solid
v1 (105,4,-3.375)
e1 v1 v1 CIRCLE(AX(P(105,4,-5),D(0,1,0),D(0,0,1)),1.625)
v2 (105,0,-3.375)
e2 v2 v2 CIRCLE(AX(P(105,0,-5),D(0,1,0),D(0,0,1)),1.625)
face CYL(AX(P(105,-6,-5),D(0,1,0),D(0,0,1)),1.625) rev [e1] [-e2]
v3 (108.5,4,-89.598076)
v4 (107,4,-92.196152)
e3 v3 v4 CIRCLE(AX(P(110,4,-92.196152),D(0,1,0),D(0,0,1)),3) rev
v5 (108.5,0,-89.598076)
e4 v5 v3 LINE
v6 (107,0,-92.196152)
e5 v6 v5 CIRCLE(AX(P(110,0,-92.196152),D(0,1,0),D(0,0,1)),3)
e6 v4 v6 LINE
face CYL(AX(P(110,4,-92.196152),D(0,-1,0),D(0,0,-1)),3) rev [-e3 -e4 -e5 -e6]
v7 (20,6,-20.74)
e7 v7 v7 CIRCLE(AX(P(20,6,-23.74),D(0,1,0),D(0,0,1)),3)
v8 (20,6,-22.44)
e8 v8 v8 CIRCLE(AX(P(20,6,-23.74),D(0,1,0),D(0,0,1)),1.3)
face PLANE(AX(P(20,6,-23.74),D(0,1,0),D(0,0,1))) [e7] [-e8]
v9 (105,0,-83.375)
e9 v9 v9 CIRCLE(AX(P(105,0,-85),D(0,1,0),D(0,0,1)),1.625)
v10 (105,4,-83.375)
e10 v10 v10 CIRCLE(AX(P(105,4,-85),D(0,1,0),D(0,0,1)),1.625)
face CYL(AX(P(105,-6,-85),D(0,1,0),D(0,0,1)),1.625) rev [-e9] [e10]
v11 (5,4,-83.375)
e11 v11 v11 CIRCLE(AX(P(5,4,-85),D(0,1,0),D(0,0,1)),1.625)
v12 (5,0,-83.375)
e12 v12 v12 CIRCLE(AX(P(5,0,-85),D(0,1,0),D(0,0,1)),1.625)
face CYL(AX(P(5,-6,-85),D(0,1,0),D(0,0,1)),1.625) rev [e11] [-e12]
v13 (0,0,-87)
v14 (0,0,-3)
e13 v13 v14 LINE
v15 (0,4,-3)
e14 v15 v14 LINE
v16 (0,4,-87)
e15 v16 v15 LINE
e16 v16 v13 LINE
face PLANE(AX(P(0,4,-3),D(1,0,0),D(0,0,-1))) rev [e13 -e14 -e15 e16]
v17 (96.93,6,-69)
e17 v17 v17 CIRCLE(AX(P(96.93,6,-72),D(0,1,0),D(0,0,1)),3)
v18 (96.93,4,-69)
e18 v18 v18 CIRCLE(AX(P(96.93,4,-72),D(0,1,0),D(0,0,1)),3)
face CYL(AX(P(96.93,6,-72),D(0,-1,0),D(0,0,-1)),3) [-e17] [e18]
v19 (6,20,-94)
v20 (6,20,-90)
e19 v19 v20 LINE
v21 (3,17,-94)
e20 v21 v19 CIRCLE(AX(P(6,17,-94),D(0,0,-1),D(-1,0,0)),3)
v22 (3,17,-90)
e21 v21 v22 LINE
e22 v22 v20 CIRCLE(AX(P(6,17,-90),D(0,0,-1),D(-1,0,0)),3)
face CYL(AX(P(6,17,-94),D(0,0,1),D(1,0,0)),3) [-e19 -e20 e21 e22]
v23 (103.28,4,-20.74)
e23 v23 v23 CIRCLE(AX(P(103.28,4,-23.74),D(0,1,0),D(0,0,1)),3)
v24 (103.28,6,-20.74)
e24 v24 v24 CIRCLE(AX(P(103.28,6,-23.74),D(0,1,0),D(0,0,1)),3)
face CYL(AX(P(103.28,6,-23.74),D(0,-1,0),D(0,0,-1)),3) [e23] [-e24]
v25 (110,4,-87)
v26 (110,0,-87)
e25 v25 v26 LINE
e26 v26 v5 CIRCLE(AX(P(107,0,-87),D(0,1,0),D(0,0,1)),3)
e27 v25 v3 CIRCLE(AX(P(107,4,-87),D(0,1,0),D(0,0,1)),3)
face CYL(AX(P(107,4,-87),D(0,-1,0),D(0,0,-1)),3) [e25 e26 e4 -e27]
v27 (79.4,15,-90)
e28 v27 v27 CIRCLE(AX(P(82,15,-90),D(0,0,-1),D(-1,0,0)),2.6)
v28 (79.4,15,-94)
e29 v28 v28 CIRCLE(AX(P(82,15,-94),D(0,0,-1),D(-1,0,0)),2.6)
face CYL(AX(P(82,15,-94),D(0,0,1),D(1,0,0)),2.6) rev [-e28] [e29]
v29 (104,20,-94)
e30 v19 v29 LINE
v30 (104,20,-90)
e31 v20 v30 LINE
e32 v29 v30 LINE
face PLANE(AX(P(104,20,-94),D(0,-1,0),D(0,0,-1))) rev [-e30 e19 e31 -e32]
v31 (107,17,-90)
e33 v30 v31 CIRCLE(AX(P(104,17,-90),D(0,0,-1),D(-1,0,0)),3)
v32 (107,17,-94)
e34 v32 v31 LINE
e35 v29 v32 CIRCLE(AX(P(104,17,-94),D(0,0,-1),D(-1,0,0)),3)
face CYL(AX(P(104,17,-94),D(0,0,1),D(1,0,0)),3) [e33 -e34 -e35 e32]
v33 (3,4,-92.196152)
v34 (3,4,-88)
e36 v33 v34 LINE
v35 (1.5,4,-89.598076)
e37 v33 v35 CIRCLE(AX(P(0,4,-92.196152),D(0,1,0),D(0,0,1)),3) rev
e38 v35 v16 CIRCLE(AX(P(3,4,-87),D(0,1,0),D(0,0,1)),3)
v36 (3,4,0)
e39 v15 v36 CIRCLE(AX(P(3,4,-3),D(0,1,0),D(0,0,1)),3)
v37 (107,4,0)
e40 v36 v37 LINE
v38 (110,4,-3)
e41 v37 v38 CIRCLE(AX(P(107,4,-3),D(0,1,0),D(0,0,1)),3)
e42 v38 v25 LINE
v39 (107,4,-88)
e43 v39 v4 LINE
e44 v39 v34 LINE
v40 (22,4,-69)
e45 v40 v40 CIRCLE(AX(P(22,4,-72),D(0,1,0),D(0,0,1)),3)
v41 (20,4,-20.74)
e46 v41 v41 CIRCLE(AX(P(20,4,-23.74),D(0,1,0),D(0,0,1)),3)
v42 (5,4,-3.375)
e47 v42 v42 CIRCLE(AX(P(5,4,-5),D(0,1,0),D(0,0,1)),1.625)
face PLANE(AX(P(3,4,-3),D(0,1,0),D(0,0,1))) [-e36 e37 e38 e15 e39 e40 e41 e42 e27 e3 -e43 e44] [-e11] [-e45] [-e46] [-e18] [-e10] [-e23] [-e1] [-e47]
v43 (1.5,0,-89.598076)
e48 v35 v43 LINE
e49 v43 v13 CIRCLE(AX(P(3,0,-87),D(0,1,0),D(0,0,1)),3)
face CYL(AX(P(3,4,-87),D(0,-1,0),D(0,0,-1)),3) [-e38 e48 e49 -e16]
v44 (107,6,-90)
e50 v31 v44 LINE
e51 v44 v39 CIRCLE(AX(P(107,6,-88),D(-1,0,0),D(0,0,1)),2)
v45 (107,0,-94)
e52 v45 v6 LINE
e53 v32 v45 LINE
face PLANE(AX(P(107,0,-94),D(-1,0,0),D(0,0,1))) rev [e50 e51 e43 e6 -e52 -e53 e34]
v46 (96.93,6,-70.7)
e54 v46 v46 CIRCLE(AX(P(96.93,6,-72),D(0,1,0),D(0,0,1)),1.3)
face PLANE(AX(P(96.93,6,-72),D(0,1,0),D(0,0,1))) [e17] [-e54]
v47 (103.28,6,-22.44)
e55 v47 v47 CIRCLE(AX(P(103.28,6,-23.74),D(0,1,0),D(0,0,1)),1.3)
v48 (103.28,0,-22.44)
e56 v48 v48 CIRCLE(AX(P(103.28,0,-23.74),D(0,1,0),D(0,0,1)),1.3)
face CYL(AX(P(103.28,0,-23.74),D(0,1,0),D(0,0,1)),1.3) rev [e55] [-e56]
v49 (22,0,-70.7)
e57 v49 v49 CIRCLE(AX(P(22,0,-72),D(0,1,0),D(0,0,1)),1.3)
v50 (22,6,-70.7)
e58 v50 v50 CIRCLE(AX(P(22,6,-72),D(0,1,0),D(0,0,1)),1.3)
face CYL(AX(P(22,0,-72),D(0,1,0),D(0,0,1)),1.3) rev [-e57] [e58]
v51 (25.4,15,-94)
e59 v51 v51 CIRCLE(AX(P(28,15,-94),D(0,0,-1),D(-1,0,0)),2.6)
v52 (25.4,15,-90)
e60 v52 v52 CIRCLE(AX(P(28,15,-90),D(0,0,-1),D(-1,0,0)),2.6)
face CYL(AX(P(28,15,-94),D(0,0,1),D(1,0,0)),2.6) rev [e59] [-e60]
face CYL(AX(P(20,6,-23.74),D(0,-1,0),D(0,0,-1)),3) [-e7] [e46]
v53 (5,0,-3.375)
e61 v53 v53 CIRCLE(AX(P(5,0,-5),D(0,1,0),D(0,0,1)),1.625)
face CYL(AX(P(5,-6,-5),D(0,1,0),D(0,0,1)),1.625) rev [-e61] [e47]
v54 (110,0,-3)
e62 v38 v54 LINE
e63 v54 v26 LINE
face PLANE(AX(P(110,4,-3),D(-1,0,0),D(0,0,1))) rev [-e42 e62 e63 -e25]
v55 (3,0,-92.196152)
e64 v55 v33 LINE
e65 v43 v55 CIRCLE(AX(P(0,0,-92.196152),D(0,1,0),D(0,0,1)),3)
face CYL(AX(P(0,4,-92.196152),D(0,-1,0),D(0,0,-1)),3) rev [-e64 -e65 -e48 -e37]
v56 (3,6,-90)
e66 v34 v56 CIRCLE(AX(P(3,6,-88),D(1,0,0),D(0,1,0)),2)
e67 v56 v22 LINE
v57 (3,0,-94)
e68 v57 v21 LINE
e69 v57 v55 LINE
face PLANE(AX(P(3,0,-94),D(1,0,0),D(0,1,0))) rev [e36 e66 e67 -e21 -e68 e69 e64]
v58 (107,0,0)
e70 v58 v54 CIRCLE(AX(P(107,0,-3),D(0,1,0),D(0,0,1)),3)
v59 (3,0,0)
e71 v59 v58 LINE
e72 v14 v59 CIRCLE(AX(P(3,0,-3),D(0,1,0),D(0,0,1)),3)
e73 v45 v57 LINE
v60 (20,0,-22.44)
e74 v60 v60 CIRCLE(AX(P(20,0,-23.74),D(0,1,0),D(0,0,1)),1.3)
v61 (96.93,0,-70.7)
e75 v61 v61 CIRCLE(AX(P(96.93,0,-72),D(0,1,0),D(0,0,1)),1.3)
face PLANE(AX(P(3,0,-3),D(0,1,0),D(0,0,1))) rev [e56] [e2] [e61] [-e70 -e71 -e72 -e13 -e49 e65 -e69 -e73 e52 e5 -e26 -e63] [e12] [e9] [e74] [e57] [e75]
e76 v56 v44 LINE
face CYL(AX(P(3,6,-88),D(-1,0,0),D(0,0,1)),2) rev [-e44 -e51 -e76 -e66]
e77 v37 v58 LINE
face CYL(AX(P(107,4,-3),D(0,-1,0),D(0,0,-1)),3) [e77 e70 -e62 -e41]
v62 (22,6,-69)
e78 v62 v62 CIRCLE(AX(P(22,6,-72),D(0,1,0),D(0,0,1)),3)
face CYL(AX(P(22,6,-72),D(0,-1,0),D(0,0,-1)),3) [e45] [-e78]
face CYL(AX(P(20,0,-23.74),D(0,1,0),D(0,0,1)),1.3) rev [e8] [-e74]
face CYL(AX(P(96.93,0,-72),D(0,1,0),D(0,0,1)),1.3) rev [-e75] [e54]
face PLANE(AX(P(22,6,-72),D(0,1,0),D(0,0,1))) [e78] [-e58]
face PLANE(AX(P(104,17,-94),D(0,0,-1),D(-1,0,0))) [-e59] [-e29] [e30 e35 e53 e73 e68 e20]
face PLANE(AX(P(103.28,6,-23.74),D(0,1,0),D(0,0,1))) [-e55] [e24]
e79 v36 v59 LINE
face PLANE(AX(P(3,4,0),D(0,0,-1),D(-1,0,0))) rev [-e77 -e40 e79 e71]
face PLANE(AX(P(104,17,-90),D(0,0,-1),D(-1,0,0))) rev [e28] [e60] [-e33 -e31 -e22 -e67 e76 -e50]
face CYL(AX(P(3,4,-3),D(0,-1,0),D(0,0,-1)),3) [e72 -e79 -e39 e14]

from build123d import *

# Parameters (mm, degrees)
BOSS_EXTRUDE1_DEPTH = 4
SKETCH2_R           = 3
BOSS_EXTRUDE2_DEPTH = 2
SKETCH3_R           = 1.3
CUT_EXTRUDE1_DEPTH  = 6
SKETCH4_R           = 2.6
BOSS_EXTRUDE3_DEPTH = 4
FILLET1_R           = 3
FILLET2_R           = 2
SKETCH5_R           = 1.625
CUT_EXTRUDE2_DEPTH  = 10


with BuildPart() as part:
    # Sketch1 → Boss-Extrude1 (new body)
    with BuildSketch(Plane(origin=(0, 0, 0), x_dir=(1, 0, 0), z_dir=(0, 1, 0))):
        with BuildLine():
            Line((3, 0), (107, 0))
            ThreePointArc((107, 0), (109.121320344, 0.878679656), (110, 3))
            Line((110, 3), (110, 87))
            ThreePointArc((110, 87), (109.121320344, 89.121320344), (107, 90))
            Line((107, 90), (3, 90))
            ThreePointArc((3, 90), (0.878679656, 89.121320344), (0, 87))
            Line((0, 87), (0, 3))
            ThreePointArc((0, 3), (0.878679656, 0.878679656), (3, 0))
        make_face()
    extrude(amount=BOSS_EXTRUDE1_DEPTH)

    # Sketch2 → Boss-Extrude2 (add)
    with BuildSketch(Plane(origin=(0, 4, 0), x_dir=(1, 0, 0), z_dir=(0, 1, 0))):
        with Locations(Location((22, 72, 0), (0, 0, 270))):
            Circle(SKETCH2_R)
        with Locations(Location((103.28, 23.74, 0), (0, 0, 270))):
            Circle(SKETCH2_R)
        with Locations(Location((96.93, 72, 0), (0, 0, 270))):
            Circle(SKETCH2_R)
        with Locations(Location((20, 23.74, 0), (0, 0, 270))):
            Circle(SKETCH2_R)
    extrude(amount=BOSS_EXTRUDE2_DEPTH)

    # Sketch3 → Cut-Extrude1 (cut)
    with BuildSketch(Plane(origin=(0, 6, 0), x_dir=(1, 0, 0), z_dir=(0, 1, 0))):
        with Locations(Location((22, 72, 0), (0, 0, 270))):
            Circle(SKETCH3_R)
        with Locations(Location((96.93, 72, 0), (0, 0, 270))):
            Circle(SKETCH3_R)
        with Locations(Location((103.28, 23.74, 0), (0, 0, 270))):
            Circle(SKETCH3_R)
        with Locations(Location((20, 23.74, 0), (0, 0, 270))):
            Circle(SKETCH3_R)
    extrude(amount=-CUT_EXTRUDE1_DEPTH, mode=Mode.SUBTRACT)

    # Sketch4 → Boss-Extrude3 (add)
    with BuildSketch(Plane(origin=(0, 0, -90), x_dir=(-1, 0, 0), z_dir=(0, 0, -1))):
        with BuildLine():
            Line((-107, 0), (-3, 0))
            Line((-3, 0), (-3, 17))
            ThreePointArc((-3, 17), (-3.878679656, 19.121320344), (-6, 20))
            Line((-6, 20), (-104, 20))
            ThreePointArc((-104, 20), (-106.121320344, 19.121320344), (-107, 17))
            Line((-107, 17), (-107, 0))
        make_face()
        with Locations((-82, 15)):
            Circle(SKETCH4_R, mode=Mode.SUBTRACT)
        with Locations((-28, 15)):
            Circle(SKETCH4_R, mode=Mode.SUBTRACT)
    extrude(amount=BOSS_EXTRUDE3_DEPTH)

    # Fillet1
    # the kernel refuses this fillet: 3 mm, written as the material it adds along each edge
    with BuildSketch(Plane(origin=(3, 0, -90), x_dir=(-0.9659258262890682, 0, 0.25881904510252113), z_dir=(0, 1, 0))) as fillet1_piece_1:
        with BuildLine():
            CenterArc((2.329371406, -2.897777479), FILLET1_R, 105, 60)
            Line((-0.568406073, -2.121320344), (0, 0))
            ThreePointArc((0, 0), (0.776457135, -0.102222521), (1.552914271, 0))
        make_face()
    extrude(amount=4)
    with BuildSketch(Plane(origin=(107, 0, -90), x_dir=(0.9659258262890682, 0, 0.2588190451025207), z_dir=(0, 1, 0))) as fillet1_piece_2:
        with BuildLine():
            CenterArc((2.329371406, 2.897777479), FILLET1_R, 195, 60)
            Line((-0.568406073, 2.121320344), (0, 0))
            ThreePointArc((0, 0), (0.776457135, 0.102222521), (1.552914271, 0))
        make_face()
    extrude(amount=4)

    # Fillet2
    fillet2_edges = [part.edges().sort_by_distance(p)[0] for p in [
        (55, 4, -90),
    ]]
    fillet(fillet2_edges, radius=FILLET2_R)

    # Sketch5 → Cut-Extrude2 (cut)
    with BuildSketch(Plane(origin=(0, 4, 0), x_dir=(1, 0, 0), z_dir=(0, 1, 0))):
        with Locations(Location((5, 85, 0), (0, 0, 270))):
            Circle(SKETCH5_R)
        with Locations(Location((105, 85, 0), (0, 0, 270))):
            Circle(SKETCH5_R)
        with Locations(Location((105, 5, 0), (0, 0, 270))):
            Circle(SKETCH5_R)
        with Locations(Location((5, 5, 0), (0, 0, 270))):
            Circle(SKETCH5_R)
    extrude(amount=-CUT_EXTRUDE2_DEPTH, mode=Mode.SUBTRACT)


solid = part.part
